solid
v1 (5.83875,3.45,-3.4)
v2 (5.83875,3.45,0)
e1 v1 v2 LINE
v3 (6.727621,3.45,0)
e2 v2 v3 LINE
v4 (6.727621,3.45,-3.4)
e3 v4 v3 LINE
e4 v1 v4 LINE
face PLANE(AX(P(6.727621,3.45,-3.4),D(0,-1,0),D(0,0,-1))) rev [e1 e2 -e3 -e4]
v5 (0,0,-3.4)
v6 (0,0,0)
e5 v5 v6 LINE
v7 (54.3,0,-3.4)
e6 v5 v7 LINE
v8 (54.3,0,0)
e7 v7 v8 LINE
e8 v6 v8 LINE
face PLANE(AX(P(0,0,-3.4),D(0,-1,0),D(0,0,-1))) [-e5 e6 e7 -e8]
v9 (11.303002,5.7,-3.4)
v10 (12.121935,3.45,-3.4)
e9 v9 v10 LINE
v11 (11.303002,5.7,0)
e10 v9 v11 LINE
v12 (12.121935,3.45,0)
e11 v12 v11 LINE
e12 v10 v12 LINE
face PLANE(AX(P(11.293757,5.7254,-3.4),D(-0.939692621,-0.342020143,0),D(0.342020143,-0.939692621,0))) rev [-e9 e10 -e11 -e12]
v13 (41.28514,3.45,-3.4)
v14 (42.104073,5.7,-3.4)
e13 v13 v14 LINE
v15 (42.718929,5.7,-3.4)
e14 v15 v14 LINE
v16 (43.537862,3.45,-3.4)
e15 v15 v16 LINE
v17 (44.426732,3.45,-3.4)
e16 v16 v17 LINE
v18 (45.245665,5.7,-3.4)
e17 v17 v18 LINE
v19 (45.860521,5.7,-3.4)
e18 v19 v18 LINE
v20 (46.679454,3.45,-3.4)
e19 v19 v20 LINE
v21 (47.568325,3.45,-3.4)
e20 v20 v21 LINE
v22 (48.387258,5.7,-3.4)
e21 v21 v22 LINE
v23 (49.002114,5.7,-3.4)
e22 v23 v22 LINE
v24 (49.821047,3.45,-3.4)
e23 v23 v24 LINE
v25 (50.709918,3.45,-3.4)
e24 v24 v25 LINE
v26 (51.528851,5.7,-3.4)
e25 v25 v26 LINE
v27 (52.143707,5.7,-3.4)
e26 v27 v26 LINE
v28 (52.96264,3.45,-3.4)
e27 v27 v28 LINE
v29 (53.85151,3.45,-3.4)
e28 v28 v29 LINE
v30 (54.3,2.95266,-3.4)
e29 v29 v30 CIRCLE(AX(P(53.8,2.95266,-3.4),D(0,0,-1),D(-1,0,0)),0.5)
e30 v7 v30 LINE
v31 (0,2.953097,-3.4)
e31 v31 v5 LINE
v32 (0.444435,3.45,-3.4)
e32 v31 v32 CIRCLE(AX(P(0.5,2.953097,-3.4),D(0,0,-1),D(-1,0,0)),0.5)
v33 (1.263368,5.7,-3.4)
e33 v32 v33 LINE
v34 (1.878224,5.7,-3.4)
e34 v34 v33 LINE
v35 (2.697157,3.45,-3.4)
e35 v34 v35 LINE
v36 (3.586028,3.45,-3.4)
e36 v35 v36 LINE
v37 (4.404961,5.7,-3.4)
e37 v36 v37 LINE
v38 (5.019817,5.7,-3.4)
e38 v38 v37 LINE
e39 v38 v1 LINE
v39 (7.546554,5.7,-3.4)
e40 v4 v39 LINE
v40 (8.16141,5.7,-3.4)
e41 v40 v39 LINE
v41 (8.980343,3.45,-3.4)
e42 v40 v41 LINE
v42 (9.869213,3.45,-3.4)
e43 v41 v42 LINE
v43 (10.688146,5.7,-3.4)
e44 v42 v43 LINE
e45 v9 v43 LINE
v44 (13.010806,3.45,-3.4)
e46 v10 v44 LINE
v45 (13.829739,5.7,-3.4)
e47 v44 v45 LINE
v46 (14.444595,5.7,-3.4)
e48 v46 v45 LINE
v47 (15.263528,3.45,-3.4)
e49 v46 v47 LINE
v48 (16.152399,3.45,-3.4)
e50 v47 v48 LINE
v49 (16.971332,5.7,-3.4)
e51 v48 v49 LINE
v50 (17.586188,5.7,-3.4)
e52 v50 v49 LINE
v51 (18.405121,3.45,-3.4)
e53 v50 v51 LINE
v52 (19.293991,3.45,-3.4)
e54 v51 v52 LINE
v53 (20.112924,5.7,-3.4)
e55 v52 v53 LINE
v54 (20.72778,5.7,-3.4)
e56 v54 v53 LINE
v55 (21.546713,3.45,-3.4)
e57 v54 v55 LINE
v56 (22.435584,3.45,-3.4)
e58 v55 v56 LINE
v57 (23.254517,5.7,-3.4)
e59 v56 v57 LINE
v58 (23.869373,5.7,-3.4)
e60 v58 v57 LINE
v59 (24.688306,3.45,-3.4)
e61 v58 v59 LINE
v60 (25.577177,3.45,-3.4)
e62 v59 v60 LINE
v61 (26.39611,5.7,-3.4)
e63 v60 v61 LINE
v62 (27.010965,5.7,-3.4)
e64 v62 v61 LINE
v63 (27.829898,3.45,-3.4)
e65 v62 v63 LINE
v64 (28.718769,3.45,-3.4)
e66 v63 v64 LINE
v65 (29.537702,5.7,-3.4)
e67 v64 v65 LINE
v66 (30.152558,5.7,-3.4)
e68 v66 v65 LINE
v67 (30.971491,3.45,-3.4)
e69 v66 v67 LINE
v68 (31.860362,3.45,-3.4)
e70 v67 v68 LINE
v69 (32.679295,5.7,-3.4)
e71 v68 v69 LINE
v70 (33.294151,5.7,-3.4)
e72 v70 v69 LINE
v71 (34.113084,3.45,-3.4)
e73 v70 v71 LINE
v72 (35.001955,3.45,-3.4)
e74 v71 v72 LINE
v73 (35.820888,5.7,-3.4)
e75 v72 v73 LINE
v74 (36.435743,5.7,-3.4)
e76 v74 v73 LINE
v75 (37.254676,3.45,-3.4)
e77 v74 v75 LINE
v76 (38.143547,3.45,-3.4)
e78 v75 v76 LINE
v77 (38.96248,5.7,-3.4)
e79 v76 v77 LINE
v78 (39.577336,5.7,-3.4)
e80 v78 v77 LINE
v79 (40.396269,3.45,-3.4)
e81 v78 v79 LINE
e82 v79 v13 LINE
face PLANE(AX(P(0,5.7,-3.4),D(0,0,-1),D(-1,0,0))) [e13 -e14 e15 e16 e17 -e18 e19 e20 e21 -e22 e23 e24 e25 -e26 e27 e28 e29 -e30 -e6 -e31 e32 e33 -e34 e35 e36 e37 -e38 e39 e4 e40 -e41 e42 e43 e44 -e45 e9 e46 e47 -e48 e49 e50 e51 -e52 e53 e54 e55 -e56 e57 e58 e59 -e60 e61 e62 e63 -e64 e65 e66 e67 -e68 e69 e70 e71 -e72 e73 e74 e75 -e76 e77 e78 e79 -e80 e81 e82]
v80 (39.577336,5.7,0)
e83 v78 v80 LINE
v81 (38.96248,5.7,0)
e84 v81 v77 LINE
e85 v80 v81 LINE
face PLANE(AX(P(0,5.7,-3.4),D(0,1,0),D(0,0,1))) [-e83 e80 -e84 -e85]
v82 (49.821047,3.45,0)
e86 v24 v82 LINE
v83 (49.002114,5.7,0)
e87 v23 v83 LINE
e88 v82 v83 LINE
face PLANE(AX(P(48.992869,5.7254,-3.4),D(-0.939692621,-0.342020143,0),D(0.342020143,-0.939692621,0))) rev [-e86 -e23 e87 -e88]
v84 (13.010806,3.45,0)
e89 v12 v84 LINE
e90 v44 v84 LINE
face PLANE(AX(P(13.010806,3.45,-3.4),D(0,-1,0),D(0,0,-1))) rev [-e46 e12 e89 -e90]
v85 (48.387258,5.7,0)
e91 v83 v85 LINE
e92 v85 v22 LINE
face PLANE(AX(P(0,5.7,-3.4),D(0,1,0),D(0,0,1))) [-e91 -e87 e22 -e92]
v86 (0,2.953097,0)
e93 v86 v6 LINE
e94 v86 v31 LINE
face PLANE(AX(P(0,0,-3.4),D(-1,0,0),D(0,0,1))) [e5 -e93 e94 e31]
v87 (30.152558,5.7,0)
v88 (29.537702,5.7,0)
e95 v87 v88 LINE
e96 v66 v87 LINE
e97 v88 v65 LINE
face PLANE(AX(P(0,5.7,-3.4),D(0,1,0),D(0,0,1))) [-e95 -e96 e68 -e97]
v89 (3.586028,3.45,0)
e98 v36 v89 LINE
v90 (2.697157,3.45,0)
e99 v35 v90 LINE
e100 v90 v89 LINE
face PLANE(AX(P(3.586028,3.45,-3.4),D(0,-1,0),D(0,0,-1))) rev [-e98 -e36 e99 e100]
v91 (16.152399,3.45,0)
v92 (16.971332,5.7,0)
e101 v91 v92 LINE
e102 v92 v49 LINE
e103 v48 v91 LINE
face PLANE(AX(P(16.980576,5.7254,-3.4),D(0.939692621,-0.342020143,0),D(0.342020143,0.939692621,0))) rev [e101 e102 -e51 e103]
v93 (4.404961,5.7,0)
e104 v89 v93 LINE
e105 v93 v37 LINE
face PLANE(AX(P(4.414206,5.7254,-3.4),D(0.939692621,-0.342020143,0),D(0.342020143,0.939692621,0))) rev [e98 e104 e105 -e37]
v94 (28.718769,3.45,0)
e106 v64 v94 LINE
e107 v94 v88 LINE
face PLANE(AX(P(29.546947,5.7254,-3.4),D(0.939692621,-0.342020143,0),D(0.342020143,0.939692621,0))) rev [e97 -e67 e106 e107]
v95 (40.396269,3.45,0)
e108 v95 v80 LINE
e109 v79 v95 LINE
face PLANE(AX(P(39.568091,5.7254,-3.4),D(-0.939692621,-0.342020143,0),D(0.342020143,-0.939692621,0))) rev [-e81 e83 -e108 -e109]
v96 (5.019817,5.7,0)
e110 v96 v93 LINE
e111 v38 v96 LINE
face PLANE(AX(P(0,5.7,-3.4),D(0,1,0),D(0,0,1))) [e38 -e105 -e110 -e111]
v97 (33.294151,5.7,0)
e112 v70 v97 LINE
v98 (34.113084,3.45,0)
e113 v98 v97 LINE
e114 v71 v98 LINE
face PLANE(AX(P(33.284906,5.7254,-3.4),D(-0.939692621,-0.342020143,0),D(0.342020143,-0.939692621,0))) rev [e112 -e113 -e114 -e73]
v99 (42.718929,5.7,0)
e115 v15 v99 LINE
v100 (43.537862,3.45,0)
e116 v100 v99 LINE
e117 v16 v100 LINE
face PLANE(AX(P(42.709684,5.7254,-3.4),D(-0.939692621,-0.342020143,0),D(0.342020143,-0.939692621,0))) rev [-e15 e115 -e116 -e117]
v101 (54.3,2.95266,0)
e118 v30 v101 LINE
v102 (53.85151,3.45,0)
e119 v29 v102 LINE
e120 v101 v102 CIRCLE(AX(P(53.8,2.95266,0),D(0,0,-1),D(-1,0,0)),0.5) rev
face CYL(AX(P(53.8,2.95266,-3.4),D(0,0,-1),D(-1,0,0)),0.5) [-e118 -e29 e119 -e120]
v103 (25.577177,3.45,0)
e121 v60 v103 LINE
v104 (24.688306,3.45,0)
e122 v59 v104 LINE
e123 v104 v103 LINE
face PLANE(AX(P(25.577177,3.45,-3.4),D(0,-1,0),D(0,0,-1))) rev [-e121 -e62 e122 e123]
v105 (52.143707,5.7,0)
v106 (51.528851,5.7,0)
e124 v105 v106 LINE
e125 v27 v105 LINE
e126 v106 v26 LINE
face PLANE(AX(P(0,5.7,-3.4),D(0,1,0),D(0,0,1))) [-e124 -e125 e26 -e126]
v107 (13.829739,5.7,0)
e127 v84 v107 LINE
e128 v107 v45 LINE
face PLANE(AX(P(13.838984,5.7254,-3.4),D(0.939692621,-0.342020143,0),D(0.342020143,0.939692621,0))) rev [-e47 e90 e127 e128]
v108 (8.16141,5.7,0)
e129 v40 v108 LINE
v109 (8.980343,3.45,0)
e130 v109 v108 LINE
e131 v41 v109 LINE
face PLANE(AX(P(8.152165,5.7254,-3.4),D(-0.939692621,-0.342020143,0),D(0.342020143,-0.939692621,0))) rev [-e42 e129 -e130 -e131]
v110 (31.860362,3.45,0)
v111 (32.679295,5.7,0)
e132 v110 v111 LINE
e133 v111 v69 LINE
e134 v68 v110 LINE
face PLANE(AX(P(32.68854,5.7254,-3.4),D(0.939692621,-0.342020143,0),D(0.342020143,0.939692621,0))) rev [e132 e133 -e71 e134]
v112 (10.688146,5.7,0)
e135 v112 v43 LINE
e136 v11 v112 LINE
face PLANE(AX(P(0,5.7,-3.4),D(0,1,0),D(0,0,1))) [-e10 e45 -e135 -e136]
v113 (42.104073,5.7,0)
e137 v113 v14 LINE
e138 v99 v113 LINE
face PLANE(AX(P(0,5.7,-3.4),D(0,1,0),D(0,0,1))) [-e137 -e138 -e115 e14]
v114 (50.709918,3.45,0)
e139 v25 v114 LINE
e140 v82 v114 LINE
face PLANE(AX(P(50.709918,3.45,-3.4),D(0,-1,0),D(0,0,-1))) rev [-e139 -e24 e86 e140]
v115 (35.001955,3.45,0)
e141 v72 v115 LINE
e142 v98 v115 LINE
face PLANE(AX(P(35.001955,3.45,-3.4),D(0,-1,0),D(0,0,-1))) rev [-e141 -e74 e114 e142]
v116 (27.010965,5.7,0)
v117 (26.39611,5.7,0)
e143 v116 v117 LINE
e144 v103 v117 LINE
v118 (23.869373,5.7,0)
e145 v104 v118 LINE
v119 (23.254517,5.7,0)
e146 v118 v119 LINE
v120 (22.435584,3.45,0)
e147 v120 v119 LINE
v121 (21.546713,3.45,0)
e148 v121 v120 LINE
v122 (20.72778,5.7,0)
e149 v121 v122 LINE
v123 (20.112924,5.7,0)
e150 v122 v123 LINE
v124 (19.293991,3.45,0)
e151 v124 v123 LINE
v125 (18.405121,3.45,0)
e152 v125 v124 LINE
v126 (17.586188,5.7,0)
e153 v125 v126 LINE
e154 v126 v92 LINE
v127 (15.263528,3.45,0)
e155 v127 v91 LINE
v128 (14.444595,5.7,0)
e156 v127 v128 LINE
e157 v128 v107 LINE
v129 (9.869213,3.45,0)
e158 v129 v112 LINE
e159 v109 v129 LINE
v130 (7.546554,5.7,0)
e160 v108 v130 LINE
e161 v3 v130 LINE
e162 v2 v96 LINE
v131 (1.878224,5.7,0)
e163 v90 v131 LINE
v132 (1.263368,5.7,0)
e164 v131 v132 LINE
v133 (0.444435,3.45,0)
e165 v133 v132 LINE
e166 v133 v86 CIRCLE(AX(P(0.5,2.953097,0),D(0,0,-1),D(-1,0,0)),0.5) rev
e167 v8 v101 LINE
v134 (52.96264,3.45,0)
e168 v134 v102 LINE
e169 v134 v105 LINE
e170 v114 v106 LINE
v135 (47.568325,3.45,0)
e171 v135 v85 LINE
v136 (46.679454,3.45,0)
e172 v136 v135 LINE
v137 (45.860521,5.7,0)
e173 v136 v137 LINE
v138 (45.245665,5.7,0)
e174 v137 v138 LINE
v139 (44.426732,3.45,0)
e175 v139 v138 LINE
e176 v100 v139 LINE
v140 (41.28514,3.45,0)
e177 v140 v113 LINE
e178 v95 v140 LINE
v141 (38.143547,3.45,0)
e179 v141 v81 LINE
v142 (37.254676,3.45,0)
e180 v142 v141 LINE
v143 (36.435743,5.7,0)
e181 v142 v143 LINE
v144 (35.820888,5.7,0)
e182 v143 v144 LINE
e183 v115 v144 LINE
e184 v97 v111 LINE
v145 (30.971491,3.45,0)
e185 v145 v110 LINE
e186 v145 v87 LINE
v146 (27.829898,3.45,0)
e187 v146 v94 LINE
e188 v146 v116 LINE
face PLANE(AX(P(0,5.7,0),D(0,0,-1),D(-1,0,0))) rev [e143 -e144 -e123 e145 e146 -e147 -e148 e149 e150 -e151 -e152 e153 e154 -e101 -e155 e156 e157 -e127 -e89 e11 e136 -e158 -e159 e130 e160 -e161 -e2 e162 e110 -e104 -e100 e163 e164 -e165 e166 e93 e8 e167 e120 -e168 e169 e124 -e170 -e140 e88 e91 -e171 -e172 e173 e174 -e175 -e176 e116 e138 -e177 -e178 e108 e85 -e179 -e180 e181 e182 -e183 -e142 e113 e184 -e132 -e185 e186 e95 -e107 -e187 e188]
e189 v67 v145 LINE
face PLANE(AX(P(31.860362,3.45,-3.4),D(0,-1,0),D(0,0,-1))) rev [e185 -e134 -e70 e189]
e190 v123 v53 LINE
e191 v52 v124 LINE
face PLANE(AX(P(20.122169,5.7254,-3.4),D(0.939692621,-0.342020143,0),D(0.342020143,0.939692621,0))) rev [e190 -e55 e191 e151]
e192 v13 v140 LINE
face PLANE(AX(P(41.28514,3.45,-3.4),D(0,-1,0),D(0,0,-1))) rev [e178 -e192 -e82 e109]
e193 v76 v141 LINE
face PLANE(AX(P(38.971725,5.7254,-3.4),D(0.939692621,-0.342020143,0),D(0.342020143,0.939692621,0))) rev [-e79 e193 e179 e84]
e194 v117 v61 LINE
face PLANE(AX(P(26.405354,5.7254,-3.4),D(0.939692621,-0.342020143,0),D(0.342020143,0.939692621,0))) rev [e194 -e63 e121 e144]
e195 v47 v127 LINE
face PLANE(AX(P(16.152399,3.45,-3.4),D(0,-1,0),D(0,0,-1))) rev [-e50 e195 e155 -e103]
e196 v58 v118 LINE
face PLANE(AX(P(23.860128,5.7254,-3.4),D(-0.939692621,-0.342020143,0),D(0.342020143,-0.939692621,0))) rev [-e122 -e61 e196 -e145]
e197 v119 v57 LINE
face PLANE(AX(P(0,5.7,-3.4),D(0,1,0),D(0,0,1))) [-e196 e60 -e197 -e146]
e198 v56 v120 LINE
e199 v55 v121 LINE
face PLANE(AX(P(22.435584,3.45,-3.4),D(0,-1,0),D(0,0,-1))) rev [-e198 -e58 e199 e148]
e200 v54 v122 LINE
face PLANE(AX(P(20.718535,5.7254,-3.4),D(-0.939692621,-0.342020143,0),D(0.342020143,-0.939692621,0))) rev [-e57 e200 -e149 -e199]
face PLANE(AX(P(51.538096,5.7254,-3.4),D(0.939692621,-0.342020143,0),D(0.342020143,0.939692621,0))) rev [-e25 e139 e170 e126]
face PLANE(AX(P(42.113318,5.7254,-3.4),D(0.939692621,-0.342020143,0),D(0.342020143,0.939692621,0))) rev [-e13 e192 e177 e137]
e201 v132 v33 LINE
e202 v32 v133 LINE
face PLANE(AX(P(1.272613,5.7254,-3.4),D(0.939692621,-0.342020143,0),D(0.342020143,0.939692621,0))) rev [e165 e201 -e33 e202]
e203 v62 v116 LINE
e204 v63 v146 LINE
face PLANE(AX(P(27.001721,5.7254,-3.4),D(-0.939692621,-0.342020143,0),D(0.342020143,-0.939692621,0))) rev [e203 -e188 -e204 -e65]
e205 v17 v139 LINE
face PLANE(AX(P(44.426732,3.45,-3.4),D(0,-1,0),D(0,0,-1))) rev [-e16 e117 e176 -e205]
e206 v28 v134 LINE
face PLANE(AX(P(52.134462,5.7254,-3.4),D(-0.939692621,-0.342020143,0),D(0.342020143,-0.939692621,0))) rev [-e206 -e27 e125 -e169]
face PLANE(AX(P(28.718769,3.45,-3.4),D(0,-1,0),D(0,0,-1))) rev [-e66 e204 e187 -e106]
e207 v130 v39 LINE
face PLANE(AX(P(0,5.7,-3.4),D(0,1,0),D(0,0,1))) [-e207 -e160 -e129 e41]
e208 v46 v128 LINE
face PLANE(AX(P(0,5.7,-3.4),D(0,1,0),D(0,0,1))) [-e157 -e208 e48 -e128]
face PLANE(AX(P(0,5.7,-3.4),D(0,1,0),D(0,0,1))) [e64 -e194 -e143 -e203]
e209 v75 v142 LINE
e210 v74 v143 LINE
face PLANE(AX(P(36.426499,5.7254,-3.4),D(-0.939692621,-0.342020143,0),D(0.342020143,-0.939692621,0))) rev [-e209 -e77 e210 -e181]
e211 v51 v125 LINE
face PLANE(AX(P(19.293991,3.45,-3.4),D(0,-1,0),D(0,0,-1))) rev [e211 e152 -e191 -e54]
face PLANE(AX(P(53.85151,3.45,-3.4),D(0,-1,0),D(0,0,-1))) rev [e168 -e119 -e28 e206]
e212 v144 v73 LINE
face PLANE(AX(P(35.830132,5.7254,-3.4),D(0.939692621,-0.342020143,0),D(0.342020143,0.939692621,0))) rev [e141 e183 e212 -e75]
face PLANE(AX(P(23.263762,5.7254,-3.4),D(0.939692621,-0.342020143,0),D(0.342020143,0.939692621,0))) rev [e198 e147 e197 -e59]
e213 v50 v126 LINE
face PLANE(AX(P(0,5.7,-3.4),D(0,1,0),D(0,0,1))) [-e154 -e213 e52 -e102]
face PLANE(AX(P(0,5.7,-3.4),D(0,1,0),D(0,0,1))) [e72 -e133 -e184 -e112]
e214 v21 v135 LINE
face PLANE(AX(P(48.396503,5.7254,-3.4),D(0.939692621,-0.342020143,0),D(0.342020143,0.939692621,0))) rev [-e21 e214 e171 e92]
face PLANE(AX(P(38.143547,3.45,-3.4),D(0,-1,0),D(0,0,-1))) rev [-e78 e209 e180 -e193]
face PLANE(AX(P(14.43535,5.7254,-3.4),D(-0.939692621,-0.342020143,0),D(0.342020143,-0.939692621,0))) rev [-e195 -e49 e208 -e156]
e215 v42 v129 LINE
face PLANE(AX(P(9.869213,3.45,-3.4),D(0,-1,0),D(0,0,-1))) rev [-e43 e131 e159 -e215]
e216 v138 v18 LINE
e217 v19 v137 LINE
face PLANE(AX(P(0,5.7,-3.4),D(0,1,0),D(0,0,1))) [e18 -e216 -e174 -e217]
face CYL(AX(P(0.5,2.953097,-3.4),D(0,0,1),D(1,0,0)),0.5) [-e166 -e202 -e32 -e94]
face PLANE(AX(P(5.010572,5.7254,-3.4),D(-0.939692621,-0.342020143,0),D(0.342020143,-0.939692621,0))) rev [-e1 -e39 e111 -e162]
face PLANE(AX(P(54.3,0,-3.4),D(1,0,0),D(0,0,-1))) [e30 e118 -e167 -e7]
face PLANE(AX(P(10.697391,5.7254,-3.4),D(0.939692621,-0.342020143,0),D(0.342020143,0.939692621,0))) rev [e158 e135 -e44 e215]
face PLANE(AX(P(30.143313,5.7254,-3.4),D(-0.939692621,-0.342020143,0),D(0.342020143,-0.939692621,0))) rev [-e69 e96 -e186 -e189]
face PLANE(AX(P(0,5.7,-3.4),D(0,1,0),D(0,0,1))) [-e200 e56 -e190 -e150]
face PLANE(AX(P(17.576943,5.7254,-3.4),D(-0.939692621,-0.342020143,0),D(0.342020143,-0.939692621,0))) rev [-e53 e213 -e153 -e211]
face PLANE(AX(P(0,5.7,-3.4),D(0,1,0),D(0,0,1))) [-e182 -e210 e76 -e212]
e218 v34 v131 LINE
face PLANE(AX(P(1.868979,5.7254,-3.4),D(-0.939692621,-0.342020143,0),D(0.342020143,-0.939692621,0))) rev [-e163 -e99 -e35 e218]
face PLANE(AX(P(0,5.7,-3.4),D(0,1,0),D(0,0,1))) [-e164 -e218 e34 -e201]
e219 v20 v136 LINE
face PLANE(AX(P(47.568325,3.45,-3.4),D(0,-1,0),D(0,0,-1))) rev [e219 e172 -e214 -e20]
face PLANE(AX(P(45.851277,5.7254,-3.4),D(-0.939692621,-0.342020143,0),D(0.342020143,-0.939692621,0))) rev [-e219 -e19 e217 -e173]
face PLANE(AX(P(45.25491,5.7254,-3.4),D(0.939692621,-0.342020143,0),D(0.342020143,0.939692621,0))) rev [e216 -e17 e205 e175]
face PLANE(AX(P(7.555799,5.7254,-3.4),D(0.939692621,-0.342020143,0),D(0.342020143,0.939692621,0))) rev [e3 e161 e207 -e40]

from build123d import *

# Parameters (mm, degrees)
BLANKSKE_W        = 54.3
BLANKSKE_H        = 5.7
BLANK_DEPTH       = 3.4
TOOTHCUTSIM_DEPTH = 55.704113191
TEETHCUTS_COUNT   = 18
TEETHCUTS_PITCH   = 3.14159265
VERRUNDUNG1_R     = 0.5
VERRUNDUNG2_R     = 0.5


with BuildPart() as part:
    # BlankSke → Blank (new body)
    with BuildSketch(Plane.XY):
        with Locations((27.15, 2.85)):
            Rectangle(BLANKSKE_W, BLANKSKE_H)
    extrude(amount=-BLANK_DEPTH)

    # TooCutSkeSim → ToothCutSim (cut, through all)
    with BuildSketch(Plane.XY):
        Polygon((0.44443537, 3.45), (-0.44443537, 3.45), (-1.272613241, 5.7254), (1.272613241, 5.7254), align=None)
    toothcutsim = extrude(amount=-TOOTHCUTSIM_DEPTH, mode=Mode.SUBTRACT)

    # TeethCuts: ToothCutSim ×18
    with Locations(*[(i * TEETHCUTS_PITCH, 0, 0) for i in range(1, TEETHCUTS_COUNT)]):
        add(toothcutsim, mode=Mode.SUBTRACT)

    # Verrundung1
    # the kernel refuses this fillet: 0.5 mm, written as the material it takes off along each edge
    with BuildSketch(Plane(origin=(54.3, 4.682214995, -7.723886484), x_dir=(0, -1, 0), z_dir=(0, 0, 1))) as verrundung1_piece_1:
        with BuildLine():
            CenterArc((1.729554594, -0.5), VERRUNDUNG1_R, 90, 84.086849411)
            Line((1.232214995, -0.44848958), (1.222268203, -0.447459372))
            ThreePointArc((1.222268203, -0.447459372), (0.612687296, -0.233641716), (-0.003420201, -0.009396926))
            Line((-0.003420201, -0.009396926), (0, 0.01))
            Line((0, 0.01), (1.729554594, 0.01))
            Line((1.729554594, 0.01), (1.729554594, 0))
        make_face()
    extrude(amount=12.047772969, mode=Mode.SUBTRACT)

    # Verrundung2
    # the kernel refuses this fillet: 0.5 mm, written as the material it takes off along each edge
    with BuildSketch(Plane(origin=(0, 3.45, 1.242257451), x_dir=(0, -1, 0), z_dir=(0, 0, -1))) as verrundung2_piece_1:
        with BuildLine():
            CenterArc((0.49690298, -0.5), VERRUNDUNG2_R, 90, 83.619583418)
            Line((0, -0.44443537), (-0.00993806, -0.443324077))
            ThreePointArc((-0.00993806, -0.443324077), (-0.01, -0.222217685), (-0.01, 0))
            Line((-0.01, 0), (0, 0.01))
            Line((0, 0.01), (0.49690298, 0.01))
            Line((0.49690298, 0.01), (0.49690298, 0))
        make_face()
    extrude(amount=5.884514902, mode=Mode.SUBTRACT)


solid = part.part
